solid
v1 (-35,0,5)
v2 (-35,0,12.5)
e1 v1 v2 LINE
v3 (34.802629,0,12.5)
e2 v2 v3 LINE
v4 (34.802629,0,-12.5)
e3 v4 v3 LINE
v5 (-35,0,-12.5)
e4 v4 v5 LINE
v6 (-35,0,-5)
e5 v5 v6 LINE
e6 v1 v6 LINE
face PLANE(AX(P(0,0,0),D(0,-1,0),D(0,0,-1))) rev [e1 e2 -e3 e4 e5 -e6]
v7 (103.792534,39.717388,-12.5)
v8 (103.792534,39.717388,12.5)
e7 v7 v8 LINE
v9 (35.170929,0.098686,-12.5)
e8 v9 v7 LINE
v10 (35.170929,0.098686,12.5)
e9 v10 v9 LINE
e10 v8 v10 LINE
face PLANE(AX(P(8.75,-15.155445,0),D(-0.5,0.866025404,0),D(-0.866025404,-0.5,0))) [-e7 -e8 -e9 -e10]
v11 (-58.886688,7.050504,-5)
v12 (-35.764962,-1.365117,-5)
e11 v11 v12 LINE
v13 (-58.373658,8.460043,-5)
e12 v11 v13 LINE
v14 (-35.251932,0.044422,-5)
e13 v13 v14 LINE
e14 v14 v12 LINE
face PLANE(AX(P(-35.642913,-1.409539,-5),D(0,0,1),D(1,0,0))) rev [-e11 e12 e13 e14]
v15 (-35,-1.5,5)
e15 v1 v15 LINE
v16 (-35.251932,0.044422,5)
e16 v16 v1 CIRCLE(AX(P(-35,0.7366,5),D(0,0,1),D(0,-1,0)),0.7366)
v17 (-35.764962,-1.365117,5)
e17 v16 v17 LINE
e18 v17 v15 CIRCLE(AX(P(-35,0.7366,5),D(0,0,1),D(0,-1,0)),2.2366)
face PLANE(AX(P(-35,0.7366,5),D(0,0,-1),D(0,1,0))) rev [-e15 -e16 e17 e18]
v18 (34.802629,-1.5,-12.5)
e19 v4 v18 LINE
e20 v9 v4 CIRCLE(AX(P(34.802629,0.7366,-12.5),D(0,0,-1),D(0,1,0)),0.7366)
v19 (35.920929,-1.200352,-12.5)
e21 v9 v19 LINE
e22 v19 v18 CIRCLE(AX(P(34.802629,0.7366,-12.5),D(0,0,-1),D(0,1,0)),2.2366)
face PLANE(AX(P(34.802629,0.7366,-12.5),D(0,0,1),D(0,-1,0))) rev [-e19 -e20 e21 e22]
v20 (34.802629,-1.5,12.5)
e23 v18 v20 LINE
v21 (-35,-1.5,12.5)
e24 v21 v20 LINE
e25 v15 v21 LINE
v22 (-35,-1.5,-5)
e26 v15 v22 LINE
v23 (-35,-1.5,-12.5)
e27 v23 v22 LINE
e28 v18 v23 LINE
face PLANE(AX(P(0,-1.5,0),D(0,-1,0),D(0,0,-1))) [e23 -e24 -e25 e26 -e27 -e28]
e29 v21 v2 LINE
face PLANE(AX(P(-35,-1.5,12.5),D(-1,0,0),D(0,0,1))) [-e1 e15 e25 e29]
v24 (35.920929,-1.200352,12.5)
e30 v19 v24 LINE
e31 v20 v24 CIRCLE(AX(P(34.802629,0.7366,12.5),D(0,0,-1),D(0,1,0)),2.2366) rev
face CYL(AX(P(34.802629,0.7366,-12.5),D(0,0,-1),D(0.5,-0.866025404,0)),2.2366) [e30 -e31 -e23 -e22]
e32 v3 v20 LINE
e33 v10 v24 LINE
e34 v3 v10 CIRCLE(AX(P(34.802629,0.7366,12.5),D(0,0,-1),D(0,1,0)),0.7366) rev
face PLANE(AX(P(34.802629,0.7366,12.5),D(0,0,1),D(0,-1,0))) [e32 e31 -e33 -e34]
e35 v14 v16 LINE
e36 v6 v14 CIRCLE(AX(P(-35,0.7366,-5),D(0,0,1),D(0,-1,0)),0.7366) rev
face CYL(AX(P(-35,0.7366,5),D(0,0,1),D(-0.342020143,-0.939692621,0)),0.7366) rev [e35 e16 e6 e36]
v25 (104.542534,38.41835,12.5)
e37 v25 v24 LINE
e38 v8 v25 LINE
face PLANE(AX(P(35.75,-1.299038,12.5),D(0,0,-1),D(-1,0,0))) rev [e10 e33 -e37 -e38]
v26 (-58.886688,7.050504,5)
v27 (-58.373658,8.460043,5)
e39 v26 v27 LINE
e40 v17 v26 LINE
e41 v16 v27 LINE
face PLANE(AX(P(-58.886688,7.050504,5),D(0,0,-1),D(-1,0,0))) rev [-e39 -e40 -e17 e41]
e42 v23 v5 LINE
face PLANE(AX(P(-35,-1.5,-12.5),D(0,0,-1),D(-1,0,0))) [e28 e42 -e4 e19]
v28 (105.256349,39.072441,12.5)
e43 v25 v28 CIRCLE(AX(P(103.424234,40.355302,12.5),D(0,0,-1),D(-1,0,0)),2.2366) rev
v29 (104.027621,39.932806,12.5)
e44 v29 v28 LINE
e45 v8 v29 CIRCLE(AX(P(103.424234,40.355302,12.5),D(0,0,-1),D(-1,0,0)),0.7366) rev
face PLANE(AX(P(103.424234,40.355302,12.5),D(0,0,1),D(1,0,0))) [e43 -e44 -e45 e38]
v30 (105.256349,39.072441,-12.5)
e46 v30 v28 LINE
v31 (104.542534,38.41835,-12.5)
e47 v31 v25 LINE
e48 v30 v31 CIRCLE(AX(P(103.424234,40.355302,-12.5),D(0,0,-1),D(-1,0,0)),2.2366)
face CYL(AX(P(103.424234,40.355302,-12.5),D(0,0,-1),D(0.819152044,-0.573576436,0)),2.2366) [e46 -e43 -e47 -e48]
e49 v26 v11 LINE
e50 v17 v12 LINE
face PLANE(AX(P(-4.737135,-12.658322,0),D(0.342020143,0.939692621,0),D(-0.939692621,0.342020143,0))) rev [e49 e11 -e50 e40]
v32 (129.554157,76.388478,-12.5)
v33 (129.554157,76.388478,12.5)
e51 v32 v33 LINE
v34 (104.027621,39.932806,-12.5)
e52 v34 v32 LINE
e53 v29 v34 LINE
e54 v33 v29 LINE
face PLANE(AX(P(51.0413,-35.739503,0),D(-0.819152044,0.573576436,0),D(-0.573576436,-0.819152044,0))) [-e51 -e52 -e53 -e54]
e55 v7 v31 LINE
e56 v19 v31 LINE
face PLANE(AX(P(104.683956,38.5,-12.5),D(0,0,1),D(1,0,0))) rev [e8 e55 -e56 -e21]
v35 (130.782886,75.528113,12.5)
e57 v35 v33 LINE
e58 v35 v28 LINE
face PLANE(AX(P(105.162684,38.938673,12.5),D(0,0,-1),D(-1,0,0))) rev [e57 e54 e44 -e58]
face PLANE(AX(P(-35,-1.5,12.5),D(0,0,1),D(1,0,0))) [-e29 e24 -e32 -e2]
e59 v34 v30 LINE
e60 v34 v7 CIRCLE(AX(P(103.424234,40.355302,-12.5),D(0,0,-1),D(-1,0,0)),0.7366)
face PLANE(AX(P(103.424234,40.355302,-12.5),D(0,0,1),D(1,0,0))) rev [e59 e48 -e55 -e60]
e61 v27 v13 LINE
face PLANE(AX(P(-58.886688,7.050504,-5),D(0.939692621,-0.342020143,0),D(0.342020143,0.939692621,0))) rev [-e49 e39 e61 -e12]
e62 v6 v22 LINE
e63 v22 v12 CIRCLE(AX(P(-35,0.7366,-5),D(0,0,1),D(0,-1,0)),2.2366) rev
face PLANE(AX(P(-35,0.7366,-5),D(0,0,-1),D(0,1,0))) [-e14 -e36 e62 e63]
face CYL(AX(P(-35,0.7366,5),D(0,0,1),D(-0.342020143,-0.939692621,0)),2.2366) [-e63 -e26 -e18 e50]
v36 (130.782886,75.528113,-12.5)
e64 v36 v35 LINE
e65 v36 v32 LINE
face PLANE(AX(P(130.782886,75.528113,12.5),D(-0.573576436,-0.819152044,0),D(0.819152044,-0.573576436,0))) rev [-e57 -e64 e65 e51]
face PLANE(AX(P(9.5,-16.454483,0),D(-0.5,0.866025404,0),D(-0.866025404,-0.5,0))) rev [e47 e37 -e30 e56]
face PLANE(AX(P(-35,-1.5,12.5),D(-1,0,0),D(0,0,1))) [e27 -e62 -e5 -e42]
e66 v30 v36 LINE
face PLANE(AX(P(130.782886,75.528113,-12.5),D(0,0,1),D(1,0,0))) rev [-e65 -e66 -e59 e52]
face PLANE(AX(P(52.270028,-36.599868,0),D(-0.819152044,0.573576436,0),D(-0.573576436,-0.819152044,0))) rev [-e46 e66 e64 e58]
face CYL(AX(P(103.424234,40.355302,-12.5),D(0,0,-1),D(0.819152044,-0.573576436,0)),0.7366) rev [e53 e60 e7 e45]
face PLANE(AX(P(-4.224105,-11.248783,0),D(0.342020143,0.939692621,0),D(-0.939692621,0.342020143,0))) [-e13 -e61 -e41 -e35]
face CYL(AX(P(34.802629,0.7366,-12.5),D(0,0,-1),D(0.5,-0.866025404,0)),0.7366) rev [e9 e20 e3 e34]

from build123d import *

# Parameters (mm, degrees)
SKETCH1_W                    = 70
SKETCH1_H                    = 25
BASE_FLANGE1_DEPTH           = 1.5
EDGE_FLANGE1_DEPTH           = 10
EDGE_FLANGE2_STRIP_CUT_DEPTH = 25
EDGE_FLANGE2_DEPTH           = 25
EDGE_FLANGE3_STRIP_CUT_DEPTH = 25
EDGE_FLANGE3_DEPTH           = 25


# Sheet-metal steps are written as plain solids
with BuildPart() as part:
    # Sketch1 → Base-Flange1 (new body)
    with BuildSketch(Plane(origin=(0, 0, 0), x_dir=(1, 0, 0), z_dir=(0, 1, 0))):
        Rectangle(SKETCH1_W, SKETCH1_H)
    extrude(amount=-BASE_FLANGE1_DEPTH)

    # Edge-Flange1 section (across the edge) → Edge-Flange1 (add)
    with BuildSketch(Plane(origin=(-35.129882454, 0, -5), x_dir=(0.3420201433256639, 0.9396926207859102, 0), z_dir=(0, 0, 1))):
        with BuildLine():
            Line((-1.5, 0.129882454), (-1.5, 24.735509529))
            Line((-1.5, 24.735509529), (0, 24.735509529))
            Line((0, 24.735509529), (0, 0.129882454))
            ThreePointArc((0, 0.129882454), (0.011190609, 0.001973206), (0.044422416, -0.122049584))
            Line((0.044422416, -0.122049584), (-1.365116516, -0.635079799))
            ThreePointArc((-1.365116516, -0.635079799), (-1.46602102, -0.25849906), (-1.5, 0.129882454))
        make_face()
    extrude(amount=EDGE_FLANGE1_DEPTH)

    # Edge-Flange2 strip (across the edge) → Edge-Flange2 strip cut (cut)
    with BuildSketch(Plane(origin=(35, 0, 12.5), x_dir=(-0.49999999999999495, 0.8660254037844416, 0), z_dir=(0, 0, -1))):
        Polygon((-4.936952418, 5.551052423), (-1.200352418, -0.920928625), (0.098685688, -0.170928625), (-3.637914312, 6.301052423), align=None)
    extrude(amount=EDGE_FLANGE2_STRIP_CUT_DEPTH, mode=Mode.SUBTRACT)

    # Edge-Flange2 section (across the edge) → Edge-Flange2 (add)
    with BuildSketch(Plane(origin=(35, 0, 12.5), x_dir=(-0.49999999999999495, 0.8660254037844416, 0), z_dir=(0, 0, -1))):
        with BuildLine():
            Line((-1.5, 0.197371375), (-1.5, 79.598076211))
            Line((-1.5, 79.598076211), (0, 79.598076211))
            Line((0, 79.598076211), (0, 0.197371375))
            ThreePointArc((0, 0.197371375), (0.025099036, 0.006725267), (0.098685688, -0.170928625))
            Line((0.098685688, -0.170928625), (-1.200352418, -0.920928625))
            ThreePointArc((-1.200352418, -0.920928625), (-1.423789703, -0.381503301), (-1.5, 0.197371375))
        make_face()
    extrude(amount=EDGE_FLANGE2_DEPTH)

    # Edge-Flange3 strip (across the edge) → Edge-Flange3 strip cut (cut)
    with BuildSketch(Plane(origin=(103.933956091, 39.799038106, 12.5), x_dir=(-0.8191520442889849, 0.573576436351056, 0), z_dir=(0, 0, -1))):
        Polygon((-4.44875879, 5.991091638), (-1.290447996, -0.781927716), (0.069013684, -0.148000323), (-3.08929711, 6.625019031), align=None)
    extrude(amount=EDGE_FLANGE3_STRIP_CUT_DEPTH, mode=Mode.SUBTRACT)

    # Edge-Flange3 section (across the edge) → Edge-Flange3 (add)
    with BuildSketch(Plane(origin=(103.933956091, 39.799038106, 12.5), x_dir=(-0.8191520442889849, 0.573576436351056, 0), z_dir=(0, 0, -1))):
        with BuildLine():
            Line((-1.5, 0.163300289), (-1.5, 44.667458006))
            Line((-1.5, 44.667458006), (0, 44.667458006))
            Line((0, 44.667458006), (0, 0.163300289))
            ThreePointArc((0, 0.163300289), (0.017460361, 0.003870869), (0.069013684, -0.148000323))
            Line((0.069013684, -0.148000323), (-1.290447996, -0.781927716))
            ThreePointArc((-1.290447996, -0.781927716), (-1.44698365, -0.320788552), (-1.5, 0.163300289))
        make_face()
    extrude(amount=EDGE_FLANGE3_DEPTH)


solid = part.part
